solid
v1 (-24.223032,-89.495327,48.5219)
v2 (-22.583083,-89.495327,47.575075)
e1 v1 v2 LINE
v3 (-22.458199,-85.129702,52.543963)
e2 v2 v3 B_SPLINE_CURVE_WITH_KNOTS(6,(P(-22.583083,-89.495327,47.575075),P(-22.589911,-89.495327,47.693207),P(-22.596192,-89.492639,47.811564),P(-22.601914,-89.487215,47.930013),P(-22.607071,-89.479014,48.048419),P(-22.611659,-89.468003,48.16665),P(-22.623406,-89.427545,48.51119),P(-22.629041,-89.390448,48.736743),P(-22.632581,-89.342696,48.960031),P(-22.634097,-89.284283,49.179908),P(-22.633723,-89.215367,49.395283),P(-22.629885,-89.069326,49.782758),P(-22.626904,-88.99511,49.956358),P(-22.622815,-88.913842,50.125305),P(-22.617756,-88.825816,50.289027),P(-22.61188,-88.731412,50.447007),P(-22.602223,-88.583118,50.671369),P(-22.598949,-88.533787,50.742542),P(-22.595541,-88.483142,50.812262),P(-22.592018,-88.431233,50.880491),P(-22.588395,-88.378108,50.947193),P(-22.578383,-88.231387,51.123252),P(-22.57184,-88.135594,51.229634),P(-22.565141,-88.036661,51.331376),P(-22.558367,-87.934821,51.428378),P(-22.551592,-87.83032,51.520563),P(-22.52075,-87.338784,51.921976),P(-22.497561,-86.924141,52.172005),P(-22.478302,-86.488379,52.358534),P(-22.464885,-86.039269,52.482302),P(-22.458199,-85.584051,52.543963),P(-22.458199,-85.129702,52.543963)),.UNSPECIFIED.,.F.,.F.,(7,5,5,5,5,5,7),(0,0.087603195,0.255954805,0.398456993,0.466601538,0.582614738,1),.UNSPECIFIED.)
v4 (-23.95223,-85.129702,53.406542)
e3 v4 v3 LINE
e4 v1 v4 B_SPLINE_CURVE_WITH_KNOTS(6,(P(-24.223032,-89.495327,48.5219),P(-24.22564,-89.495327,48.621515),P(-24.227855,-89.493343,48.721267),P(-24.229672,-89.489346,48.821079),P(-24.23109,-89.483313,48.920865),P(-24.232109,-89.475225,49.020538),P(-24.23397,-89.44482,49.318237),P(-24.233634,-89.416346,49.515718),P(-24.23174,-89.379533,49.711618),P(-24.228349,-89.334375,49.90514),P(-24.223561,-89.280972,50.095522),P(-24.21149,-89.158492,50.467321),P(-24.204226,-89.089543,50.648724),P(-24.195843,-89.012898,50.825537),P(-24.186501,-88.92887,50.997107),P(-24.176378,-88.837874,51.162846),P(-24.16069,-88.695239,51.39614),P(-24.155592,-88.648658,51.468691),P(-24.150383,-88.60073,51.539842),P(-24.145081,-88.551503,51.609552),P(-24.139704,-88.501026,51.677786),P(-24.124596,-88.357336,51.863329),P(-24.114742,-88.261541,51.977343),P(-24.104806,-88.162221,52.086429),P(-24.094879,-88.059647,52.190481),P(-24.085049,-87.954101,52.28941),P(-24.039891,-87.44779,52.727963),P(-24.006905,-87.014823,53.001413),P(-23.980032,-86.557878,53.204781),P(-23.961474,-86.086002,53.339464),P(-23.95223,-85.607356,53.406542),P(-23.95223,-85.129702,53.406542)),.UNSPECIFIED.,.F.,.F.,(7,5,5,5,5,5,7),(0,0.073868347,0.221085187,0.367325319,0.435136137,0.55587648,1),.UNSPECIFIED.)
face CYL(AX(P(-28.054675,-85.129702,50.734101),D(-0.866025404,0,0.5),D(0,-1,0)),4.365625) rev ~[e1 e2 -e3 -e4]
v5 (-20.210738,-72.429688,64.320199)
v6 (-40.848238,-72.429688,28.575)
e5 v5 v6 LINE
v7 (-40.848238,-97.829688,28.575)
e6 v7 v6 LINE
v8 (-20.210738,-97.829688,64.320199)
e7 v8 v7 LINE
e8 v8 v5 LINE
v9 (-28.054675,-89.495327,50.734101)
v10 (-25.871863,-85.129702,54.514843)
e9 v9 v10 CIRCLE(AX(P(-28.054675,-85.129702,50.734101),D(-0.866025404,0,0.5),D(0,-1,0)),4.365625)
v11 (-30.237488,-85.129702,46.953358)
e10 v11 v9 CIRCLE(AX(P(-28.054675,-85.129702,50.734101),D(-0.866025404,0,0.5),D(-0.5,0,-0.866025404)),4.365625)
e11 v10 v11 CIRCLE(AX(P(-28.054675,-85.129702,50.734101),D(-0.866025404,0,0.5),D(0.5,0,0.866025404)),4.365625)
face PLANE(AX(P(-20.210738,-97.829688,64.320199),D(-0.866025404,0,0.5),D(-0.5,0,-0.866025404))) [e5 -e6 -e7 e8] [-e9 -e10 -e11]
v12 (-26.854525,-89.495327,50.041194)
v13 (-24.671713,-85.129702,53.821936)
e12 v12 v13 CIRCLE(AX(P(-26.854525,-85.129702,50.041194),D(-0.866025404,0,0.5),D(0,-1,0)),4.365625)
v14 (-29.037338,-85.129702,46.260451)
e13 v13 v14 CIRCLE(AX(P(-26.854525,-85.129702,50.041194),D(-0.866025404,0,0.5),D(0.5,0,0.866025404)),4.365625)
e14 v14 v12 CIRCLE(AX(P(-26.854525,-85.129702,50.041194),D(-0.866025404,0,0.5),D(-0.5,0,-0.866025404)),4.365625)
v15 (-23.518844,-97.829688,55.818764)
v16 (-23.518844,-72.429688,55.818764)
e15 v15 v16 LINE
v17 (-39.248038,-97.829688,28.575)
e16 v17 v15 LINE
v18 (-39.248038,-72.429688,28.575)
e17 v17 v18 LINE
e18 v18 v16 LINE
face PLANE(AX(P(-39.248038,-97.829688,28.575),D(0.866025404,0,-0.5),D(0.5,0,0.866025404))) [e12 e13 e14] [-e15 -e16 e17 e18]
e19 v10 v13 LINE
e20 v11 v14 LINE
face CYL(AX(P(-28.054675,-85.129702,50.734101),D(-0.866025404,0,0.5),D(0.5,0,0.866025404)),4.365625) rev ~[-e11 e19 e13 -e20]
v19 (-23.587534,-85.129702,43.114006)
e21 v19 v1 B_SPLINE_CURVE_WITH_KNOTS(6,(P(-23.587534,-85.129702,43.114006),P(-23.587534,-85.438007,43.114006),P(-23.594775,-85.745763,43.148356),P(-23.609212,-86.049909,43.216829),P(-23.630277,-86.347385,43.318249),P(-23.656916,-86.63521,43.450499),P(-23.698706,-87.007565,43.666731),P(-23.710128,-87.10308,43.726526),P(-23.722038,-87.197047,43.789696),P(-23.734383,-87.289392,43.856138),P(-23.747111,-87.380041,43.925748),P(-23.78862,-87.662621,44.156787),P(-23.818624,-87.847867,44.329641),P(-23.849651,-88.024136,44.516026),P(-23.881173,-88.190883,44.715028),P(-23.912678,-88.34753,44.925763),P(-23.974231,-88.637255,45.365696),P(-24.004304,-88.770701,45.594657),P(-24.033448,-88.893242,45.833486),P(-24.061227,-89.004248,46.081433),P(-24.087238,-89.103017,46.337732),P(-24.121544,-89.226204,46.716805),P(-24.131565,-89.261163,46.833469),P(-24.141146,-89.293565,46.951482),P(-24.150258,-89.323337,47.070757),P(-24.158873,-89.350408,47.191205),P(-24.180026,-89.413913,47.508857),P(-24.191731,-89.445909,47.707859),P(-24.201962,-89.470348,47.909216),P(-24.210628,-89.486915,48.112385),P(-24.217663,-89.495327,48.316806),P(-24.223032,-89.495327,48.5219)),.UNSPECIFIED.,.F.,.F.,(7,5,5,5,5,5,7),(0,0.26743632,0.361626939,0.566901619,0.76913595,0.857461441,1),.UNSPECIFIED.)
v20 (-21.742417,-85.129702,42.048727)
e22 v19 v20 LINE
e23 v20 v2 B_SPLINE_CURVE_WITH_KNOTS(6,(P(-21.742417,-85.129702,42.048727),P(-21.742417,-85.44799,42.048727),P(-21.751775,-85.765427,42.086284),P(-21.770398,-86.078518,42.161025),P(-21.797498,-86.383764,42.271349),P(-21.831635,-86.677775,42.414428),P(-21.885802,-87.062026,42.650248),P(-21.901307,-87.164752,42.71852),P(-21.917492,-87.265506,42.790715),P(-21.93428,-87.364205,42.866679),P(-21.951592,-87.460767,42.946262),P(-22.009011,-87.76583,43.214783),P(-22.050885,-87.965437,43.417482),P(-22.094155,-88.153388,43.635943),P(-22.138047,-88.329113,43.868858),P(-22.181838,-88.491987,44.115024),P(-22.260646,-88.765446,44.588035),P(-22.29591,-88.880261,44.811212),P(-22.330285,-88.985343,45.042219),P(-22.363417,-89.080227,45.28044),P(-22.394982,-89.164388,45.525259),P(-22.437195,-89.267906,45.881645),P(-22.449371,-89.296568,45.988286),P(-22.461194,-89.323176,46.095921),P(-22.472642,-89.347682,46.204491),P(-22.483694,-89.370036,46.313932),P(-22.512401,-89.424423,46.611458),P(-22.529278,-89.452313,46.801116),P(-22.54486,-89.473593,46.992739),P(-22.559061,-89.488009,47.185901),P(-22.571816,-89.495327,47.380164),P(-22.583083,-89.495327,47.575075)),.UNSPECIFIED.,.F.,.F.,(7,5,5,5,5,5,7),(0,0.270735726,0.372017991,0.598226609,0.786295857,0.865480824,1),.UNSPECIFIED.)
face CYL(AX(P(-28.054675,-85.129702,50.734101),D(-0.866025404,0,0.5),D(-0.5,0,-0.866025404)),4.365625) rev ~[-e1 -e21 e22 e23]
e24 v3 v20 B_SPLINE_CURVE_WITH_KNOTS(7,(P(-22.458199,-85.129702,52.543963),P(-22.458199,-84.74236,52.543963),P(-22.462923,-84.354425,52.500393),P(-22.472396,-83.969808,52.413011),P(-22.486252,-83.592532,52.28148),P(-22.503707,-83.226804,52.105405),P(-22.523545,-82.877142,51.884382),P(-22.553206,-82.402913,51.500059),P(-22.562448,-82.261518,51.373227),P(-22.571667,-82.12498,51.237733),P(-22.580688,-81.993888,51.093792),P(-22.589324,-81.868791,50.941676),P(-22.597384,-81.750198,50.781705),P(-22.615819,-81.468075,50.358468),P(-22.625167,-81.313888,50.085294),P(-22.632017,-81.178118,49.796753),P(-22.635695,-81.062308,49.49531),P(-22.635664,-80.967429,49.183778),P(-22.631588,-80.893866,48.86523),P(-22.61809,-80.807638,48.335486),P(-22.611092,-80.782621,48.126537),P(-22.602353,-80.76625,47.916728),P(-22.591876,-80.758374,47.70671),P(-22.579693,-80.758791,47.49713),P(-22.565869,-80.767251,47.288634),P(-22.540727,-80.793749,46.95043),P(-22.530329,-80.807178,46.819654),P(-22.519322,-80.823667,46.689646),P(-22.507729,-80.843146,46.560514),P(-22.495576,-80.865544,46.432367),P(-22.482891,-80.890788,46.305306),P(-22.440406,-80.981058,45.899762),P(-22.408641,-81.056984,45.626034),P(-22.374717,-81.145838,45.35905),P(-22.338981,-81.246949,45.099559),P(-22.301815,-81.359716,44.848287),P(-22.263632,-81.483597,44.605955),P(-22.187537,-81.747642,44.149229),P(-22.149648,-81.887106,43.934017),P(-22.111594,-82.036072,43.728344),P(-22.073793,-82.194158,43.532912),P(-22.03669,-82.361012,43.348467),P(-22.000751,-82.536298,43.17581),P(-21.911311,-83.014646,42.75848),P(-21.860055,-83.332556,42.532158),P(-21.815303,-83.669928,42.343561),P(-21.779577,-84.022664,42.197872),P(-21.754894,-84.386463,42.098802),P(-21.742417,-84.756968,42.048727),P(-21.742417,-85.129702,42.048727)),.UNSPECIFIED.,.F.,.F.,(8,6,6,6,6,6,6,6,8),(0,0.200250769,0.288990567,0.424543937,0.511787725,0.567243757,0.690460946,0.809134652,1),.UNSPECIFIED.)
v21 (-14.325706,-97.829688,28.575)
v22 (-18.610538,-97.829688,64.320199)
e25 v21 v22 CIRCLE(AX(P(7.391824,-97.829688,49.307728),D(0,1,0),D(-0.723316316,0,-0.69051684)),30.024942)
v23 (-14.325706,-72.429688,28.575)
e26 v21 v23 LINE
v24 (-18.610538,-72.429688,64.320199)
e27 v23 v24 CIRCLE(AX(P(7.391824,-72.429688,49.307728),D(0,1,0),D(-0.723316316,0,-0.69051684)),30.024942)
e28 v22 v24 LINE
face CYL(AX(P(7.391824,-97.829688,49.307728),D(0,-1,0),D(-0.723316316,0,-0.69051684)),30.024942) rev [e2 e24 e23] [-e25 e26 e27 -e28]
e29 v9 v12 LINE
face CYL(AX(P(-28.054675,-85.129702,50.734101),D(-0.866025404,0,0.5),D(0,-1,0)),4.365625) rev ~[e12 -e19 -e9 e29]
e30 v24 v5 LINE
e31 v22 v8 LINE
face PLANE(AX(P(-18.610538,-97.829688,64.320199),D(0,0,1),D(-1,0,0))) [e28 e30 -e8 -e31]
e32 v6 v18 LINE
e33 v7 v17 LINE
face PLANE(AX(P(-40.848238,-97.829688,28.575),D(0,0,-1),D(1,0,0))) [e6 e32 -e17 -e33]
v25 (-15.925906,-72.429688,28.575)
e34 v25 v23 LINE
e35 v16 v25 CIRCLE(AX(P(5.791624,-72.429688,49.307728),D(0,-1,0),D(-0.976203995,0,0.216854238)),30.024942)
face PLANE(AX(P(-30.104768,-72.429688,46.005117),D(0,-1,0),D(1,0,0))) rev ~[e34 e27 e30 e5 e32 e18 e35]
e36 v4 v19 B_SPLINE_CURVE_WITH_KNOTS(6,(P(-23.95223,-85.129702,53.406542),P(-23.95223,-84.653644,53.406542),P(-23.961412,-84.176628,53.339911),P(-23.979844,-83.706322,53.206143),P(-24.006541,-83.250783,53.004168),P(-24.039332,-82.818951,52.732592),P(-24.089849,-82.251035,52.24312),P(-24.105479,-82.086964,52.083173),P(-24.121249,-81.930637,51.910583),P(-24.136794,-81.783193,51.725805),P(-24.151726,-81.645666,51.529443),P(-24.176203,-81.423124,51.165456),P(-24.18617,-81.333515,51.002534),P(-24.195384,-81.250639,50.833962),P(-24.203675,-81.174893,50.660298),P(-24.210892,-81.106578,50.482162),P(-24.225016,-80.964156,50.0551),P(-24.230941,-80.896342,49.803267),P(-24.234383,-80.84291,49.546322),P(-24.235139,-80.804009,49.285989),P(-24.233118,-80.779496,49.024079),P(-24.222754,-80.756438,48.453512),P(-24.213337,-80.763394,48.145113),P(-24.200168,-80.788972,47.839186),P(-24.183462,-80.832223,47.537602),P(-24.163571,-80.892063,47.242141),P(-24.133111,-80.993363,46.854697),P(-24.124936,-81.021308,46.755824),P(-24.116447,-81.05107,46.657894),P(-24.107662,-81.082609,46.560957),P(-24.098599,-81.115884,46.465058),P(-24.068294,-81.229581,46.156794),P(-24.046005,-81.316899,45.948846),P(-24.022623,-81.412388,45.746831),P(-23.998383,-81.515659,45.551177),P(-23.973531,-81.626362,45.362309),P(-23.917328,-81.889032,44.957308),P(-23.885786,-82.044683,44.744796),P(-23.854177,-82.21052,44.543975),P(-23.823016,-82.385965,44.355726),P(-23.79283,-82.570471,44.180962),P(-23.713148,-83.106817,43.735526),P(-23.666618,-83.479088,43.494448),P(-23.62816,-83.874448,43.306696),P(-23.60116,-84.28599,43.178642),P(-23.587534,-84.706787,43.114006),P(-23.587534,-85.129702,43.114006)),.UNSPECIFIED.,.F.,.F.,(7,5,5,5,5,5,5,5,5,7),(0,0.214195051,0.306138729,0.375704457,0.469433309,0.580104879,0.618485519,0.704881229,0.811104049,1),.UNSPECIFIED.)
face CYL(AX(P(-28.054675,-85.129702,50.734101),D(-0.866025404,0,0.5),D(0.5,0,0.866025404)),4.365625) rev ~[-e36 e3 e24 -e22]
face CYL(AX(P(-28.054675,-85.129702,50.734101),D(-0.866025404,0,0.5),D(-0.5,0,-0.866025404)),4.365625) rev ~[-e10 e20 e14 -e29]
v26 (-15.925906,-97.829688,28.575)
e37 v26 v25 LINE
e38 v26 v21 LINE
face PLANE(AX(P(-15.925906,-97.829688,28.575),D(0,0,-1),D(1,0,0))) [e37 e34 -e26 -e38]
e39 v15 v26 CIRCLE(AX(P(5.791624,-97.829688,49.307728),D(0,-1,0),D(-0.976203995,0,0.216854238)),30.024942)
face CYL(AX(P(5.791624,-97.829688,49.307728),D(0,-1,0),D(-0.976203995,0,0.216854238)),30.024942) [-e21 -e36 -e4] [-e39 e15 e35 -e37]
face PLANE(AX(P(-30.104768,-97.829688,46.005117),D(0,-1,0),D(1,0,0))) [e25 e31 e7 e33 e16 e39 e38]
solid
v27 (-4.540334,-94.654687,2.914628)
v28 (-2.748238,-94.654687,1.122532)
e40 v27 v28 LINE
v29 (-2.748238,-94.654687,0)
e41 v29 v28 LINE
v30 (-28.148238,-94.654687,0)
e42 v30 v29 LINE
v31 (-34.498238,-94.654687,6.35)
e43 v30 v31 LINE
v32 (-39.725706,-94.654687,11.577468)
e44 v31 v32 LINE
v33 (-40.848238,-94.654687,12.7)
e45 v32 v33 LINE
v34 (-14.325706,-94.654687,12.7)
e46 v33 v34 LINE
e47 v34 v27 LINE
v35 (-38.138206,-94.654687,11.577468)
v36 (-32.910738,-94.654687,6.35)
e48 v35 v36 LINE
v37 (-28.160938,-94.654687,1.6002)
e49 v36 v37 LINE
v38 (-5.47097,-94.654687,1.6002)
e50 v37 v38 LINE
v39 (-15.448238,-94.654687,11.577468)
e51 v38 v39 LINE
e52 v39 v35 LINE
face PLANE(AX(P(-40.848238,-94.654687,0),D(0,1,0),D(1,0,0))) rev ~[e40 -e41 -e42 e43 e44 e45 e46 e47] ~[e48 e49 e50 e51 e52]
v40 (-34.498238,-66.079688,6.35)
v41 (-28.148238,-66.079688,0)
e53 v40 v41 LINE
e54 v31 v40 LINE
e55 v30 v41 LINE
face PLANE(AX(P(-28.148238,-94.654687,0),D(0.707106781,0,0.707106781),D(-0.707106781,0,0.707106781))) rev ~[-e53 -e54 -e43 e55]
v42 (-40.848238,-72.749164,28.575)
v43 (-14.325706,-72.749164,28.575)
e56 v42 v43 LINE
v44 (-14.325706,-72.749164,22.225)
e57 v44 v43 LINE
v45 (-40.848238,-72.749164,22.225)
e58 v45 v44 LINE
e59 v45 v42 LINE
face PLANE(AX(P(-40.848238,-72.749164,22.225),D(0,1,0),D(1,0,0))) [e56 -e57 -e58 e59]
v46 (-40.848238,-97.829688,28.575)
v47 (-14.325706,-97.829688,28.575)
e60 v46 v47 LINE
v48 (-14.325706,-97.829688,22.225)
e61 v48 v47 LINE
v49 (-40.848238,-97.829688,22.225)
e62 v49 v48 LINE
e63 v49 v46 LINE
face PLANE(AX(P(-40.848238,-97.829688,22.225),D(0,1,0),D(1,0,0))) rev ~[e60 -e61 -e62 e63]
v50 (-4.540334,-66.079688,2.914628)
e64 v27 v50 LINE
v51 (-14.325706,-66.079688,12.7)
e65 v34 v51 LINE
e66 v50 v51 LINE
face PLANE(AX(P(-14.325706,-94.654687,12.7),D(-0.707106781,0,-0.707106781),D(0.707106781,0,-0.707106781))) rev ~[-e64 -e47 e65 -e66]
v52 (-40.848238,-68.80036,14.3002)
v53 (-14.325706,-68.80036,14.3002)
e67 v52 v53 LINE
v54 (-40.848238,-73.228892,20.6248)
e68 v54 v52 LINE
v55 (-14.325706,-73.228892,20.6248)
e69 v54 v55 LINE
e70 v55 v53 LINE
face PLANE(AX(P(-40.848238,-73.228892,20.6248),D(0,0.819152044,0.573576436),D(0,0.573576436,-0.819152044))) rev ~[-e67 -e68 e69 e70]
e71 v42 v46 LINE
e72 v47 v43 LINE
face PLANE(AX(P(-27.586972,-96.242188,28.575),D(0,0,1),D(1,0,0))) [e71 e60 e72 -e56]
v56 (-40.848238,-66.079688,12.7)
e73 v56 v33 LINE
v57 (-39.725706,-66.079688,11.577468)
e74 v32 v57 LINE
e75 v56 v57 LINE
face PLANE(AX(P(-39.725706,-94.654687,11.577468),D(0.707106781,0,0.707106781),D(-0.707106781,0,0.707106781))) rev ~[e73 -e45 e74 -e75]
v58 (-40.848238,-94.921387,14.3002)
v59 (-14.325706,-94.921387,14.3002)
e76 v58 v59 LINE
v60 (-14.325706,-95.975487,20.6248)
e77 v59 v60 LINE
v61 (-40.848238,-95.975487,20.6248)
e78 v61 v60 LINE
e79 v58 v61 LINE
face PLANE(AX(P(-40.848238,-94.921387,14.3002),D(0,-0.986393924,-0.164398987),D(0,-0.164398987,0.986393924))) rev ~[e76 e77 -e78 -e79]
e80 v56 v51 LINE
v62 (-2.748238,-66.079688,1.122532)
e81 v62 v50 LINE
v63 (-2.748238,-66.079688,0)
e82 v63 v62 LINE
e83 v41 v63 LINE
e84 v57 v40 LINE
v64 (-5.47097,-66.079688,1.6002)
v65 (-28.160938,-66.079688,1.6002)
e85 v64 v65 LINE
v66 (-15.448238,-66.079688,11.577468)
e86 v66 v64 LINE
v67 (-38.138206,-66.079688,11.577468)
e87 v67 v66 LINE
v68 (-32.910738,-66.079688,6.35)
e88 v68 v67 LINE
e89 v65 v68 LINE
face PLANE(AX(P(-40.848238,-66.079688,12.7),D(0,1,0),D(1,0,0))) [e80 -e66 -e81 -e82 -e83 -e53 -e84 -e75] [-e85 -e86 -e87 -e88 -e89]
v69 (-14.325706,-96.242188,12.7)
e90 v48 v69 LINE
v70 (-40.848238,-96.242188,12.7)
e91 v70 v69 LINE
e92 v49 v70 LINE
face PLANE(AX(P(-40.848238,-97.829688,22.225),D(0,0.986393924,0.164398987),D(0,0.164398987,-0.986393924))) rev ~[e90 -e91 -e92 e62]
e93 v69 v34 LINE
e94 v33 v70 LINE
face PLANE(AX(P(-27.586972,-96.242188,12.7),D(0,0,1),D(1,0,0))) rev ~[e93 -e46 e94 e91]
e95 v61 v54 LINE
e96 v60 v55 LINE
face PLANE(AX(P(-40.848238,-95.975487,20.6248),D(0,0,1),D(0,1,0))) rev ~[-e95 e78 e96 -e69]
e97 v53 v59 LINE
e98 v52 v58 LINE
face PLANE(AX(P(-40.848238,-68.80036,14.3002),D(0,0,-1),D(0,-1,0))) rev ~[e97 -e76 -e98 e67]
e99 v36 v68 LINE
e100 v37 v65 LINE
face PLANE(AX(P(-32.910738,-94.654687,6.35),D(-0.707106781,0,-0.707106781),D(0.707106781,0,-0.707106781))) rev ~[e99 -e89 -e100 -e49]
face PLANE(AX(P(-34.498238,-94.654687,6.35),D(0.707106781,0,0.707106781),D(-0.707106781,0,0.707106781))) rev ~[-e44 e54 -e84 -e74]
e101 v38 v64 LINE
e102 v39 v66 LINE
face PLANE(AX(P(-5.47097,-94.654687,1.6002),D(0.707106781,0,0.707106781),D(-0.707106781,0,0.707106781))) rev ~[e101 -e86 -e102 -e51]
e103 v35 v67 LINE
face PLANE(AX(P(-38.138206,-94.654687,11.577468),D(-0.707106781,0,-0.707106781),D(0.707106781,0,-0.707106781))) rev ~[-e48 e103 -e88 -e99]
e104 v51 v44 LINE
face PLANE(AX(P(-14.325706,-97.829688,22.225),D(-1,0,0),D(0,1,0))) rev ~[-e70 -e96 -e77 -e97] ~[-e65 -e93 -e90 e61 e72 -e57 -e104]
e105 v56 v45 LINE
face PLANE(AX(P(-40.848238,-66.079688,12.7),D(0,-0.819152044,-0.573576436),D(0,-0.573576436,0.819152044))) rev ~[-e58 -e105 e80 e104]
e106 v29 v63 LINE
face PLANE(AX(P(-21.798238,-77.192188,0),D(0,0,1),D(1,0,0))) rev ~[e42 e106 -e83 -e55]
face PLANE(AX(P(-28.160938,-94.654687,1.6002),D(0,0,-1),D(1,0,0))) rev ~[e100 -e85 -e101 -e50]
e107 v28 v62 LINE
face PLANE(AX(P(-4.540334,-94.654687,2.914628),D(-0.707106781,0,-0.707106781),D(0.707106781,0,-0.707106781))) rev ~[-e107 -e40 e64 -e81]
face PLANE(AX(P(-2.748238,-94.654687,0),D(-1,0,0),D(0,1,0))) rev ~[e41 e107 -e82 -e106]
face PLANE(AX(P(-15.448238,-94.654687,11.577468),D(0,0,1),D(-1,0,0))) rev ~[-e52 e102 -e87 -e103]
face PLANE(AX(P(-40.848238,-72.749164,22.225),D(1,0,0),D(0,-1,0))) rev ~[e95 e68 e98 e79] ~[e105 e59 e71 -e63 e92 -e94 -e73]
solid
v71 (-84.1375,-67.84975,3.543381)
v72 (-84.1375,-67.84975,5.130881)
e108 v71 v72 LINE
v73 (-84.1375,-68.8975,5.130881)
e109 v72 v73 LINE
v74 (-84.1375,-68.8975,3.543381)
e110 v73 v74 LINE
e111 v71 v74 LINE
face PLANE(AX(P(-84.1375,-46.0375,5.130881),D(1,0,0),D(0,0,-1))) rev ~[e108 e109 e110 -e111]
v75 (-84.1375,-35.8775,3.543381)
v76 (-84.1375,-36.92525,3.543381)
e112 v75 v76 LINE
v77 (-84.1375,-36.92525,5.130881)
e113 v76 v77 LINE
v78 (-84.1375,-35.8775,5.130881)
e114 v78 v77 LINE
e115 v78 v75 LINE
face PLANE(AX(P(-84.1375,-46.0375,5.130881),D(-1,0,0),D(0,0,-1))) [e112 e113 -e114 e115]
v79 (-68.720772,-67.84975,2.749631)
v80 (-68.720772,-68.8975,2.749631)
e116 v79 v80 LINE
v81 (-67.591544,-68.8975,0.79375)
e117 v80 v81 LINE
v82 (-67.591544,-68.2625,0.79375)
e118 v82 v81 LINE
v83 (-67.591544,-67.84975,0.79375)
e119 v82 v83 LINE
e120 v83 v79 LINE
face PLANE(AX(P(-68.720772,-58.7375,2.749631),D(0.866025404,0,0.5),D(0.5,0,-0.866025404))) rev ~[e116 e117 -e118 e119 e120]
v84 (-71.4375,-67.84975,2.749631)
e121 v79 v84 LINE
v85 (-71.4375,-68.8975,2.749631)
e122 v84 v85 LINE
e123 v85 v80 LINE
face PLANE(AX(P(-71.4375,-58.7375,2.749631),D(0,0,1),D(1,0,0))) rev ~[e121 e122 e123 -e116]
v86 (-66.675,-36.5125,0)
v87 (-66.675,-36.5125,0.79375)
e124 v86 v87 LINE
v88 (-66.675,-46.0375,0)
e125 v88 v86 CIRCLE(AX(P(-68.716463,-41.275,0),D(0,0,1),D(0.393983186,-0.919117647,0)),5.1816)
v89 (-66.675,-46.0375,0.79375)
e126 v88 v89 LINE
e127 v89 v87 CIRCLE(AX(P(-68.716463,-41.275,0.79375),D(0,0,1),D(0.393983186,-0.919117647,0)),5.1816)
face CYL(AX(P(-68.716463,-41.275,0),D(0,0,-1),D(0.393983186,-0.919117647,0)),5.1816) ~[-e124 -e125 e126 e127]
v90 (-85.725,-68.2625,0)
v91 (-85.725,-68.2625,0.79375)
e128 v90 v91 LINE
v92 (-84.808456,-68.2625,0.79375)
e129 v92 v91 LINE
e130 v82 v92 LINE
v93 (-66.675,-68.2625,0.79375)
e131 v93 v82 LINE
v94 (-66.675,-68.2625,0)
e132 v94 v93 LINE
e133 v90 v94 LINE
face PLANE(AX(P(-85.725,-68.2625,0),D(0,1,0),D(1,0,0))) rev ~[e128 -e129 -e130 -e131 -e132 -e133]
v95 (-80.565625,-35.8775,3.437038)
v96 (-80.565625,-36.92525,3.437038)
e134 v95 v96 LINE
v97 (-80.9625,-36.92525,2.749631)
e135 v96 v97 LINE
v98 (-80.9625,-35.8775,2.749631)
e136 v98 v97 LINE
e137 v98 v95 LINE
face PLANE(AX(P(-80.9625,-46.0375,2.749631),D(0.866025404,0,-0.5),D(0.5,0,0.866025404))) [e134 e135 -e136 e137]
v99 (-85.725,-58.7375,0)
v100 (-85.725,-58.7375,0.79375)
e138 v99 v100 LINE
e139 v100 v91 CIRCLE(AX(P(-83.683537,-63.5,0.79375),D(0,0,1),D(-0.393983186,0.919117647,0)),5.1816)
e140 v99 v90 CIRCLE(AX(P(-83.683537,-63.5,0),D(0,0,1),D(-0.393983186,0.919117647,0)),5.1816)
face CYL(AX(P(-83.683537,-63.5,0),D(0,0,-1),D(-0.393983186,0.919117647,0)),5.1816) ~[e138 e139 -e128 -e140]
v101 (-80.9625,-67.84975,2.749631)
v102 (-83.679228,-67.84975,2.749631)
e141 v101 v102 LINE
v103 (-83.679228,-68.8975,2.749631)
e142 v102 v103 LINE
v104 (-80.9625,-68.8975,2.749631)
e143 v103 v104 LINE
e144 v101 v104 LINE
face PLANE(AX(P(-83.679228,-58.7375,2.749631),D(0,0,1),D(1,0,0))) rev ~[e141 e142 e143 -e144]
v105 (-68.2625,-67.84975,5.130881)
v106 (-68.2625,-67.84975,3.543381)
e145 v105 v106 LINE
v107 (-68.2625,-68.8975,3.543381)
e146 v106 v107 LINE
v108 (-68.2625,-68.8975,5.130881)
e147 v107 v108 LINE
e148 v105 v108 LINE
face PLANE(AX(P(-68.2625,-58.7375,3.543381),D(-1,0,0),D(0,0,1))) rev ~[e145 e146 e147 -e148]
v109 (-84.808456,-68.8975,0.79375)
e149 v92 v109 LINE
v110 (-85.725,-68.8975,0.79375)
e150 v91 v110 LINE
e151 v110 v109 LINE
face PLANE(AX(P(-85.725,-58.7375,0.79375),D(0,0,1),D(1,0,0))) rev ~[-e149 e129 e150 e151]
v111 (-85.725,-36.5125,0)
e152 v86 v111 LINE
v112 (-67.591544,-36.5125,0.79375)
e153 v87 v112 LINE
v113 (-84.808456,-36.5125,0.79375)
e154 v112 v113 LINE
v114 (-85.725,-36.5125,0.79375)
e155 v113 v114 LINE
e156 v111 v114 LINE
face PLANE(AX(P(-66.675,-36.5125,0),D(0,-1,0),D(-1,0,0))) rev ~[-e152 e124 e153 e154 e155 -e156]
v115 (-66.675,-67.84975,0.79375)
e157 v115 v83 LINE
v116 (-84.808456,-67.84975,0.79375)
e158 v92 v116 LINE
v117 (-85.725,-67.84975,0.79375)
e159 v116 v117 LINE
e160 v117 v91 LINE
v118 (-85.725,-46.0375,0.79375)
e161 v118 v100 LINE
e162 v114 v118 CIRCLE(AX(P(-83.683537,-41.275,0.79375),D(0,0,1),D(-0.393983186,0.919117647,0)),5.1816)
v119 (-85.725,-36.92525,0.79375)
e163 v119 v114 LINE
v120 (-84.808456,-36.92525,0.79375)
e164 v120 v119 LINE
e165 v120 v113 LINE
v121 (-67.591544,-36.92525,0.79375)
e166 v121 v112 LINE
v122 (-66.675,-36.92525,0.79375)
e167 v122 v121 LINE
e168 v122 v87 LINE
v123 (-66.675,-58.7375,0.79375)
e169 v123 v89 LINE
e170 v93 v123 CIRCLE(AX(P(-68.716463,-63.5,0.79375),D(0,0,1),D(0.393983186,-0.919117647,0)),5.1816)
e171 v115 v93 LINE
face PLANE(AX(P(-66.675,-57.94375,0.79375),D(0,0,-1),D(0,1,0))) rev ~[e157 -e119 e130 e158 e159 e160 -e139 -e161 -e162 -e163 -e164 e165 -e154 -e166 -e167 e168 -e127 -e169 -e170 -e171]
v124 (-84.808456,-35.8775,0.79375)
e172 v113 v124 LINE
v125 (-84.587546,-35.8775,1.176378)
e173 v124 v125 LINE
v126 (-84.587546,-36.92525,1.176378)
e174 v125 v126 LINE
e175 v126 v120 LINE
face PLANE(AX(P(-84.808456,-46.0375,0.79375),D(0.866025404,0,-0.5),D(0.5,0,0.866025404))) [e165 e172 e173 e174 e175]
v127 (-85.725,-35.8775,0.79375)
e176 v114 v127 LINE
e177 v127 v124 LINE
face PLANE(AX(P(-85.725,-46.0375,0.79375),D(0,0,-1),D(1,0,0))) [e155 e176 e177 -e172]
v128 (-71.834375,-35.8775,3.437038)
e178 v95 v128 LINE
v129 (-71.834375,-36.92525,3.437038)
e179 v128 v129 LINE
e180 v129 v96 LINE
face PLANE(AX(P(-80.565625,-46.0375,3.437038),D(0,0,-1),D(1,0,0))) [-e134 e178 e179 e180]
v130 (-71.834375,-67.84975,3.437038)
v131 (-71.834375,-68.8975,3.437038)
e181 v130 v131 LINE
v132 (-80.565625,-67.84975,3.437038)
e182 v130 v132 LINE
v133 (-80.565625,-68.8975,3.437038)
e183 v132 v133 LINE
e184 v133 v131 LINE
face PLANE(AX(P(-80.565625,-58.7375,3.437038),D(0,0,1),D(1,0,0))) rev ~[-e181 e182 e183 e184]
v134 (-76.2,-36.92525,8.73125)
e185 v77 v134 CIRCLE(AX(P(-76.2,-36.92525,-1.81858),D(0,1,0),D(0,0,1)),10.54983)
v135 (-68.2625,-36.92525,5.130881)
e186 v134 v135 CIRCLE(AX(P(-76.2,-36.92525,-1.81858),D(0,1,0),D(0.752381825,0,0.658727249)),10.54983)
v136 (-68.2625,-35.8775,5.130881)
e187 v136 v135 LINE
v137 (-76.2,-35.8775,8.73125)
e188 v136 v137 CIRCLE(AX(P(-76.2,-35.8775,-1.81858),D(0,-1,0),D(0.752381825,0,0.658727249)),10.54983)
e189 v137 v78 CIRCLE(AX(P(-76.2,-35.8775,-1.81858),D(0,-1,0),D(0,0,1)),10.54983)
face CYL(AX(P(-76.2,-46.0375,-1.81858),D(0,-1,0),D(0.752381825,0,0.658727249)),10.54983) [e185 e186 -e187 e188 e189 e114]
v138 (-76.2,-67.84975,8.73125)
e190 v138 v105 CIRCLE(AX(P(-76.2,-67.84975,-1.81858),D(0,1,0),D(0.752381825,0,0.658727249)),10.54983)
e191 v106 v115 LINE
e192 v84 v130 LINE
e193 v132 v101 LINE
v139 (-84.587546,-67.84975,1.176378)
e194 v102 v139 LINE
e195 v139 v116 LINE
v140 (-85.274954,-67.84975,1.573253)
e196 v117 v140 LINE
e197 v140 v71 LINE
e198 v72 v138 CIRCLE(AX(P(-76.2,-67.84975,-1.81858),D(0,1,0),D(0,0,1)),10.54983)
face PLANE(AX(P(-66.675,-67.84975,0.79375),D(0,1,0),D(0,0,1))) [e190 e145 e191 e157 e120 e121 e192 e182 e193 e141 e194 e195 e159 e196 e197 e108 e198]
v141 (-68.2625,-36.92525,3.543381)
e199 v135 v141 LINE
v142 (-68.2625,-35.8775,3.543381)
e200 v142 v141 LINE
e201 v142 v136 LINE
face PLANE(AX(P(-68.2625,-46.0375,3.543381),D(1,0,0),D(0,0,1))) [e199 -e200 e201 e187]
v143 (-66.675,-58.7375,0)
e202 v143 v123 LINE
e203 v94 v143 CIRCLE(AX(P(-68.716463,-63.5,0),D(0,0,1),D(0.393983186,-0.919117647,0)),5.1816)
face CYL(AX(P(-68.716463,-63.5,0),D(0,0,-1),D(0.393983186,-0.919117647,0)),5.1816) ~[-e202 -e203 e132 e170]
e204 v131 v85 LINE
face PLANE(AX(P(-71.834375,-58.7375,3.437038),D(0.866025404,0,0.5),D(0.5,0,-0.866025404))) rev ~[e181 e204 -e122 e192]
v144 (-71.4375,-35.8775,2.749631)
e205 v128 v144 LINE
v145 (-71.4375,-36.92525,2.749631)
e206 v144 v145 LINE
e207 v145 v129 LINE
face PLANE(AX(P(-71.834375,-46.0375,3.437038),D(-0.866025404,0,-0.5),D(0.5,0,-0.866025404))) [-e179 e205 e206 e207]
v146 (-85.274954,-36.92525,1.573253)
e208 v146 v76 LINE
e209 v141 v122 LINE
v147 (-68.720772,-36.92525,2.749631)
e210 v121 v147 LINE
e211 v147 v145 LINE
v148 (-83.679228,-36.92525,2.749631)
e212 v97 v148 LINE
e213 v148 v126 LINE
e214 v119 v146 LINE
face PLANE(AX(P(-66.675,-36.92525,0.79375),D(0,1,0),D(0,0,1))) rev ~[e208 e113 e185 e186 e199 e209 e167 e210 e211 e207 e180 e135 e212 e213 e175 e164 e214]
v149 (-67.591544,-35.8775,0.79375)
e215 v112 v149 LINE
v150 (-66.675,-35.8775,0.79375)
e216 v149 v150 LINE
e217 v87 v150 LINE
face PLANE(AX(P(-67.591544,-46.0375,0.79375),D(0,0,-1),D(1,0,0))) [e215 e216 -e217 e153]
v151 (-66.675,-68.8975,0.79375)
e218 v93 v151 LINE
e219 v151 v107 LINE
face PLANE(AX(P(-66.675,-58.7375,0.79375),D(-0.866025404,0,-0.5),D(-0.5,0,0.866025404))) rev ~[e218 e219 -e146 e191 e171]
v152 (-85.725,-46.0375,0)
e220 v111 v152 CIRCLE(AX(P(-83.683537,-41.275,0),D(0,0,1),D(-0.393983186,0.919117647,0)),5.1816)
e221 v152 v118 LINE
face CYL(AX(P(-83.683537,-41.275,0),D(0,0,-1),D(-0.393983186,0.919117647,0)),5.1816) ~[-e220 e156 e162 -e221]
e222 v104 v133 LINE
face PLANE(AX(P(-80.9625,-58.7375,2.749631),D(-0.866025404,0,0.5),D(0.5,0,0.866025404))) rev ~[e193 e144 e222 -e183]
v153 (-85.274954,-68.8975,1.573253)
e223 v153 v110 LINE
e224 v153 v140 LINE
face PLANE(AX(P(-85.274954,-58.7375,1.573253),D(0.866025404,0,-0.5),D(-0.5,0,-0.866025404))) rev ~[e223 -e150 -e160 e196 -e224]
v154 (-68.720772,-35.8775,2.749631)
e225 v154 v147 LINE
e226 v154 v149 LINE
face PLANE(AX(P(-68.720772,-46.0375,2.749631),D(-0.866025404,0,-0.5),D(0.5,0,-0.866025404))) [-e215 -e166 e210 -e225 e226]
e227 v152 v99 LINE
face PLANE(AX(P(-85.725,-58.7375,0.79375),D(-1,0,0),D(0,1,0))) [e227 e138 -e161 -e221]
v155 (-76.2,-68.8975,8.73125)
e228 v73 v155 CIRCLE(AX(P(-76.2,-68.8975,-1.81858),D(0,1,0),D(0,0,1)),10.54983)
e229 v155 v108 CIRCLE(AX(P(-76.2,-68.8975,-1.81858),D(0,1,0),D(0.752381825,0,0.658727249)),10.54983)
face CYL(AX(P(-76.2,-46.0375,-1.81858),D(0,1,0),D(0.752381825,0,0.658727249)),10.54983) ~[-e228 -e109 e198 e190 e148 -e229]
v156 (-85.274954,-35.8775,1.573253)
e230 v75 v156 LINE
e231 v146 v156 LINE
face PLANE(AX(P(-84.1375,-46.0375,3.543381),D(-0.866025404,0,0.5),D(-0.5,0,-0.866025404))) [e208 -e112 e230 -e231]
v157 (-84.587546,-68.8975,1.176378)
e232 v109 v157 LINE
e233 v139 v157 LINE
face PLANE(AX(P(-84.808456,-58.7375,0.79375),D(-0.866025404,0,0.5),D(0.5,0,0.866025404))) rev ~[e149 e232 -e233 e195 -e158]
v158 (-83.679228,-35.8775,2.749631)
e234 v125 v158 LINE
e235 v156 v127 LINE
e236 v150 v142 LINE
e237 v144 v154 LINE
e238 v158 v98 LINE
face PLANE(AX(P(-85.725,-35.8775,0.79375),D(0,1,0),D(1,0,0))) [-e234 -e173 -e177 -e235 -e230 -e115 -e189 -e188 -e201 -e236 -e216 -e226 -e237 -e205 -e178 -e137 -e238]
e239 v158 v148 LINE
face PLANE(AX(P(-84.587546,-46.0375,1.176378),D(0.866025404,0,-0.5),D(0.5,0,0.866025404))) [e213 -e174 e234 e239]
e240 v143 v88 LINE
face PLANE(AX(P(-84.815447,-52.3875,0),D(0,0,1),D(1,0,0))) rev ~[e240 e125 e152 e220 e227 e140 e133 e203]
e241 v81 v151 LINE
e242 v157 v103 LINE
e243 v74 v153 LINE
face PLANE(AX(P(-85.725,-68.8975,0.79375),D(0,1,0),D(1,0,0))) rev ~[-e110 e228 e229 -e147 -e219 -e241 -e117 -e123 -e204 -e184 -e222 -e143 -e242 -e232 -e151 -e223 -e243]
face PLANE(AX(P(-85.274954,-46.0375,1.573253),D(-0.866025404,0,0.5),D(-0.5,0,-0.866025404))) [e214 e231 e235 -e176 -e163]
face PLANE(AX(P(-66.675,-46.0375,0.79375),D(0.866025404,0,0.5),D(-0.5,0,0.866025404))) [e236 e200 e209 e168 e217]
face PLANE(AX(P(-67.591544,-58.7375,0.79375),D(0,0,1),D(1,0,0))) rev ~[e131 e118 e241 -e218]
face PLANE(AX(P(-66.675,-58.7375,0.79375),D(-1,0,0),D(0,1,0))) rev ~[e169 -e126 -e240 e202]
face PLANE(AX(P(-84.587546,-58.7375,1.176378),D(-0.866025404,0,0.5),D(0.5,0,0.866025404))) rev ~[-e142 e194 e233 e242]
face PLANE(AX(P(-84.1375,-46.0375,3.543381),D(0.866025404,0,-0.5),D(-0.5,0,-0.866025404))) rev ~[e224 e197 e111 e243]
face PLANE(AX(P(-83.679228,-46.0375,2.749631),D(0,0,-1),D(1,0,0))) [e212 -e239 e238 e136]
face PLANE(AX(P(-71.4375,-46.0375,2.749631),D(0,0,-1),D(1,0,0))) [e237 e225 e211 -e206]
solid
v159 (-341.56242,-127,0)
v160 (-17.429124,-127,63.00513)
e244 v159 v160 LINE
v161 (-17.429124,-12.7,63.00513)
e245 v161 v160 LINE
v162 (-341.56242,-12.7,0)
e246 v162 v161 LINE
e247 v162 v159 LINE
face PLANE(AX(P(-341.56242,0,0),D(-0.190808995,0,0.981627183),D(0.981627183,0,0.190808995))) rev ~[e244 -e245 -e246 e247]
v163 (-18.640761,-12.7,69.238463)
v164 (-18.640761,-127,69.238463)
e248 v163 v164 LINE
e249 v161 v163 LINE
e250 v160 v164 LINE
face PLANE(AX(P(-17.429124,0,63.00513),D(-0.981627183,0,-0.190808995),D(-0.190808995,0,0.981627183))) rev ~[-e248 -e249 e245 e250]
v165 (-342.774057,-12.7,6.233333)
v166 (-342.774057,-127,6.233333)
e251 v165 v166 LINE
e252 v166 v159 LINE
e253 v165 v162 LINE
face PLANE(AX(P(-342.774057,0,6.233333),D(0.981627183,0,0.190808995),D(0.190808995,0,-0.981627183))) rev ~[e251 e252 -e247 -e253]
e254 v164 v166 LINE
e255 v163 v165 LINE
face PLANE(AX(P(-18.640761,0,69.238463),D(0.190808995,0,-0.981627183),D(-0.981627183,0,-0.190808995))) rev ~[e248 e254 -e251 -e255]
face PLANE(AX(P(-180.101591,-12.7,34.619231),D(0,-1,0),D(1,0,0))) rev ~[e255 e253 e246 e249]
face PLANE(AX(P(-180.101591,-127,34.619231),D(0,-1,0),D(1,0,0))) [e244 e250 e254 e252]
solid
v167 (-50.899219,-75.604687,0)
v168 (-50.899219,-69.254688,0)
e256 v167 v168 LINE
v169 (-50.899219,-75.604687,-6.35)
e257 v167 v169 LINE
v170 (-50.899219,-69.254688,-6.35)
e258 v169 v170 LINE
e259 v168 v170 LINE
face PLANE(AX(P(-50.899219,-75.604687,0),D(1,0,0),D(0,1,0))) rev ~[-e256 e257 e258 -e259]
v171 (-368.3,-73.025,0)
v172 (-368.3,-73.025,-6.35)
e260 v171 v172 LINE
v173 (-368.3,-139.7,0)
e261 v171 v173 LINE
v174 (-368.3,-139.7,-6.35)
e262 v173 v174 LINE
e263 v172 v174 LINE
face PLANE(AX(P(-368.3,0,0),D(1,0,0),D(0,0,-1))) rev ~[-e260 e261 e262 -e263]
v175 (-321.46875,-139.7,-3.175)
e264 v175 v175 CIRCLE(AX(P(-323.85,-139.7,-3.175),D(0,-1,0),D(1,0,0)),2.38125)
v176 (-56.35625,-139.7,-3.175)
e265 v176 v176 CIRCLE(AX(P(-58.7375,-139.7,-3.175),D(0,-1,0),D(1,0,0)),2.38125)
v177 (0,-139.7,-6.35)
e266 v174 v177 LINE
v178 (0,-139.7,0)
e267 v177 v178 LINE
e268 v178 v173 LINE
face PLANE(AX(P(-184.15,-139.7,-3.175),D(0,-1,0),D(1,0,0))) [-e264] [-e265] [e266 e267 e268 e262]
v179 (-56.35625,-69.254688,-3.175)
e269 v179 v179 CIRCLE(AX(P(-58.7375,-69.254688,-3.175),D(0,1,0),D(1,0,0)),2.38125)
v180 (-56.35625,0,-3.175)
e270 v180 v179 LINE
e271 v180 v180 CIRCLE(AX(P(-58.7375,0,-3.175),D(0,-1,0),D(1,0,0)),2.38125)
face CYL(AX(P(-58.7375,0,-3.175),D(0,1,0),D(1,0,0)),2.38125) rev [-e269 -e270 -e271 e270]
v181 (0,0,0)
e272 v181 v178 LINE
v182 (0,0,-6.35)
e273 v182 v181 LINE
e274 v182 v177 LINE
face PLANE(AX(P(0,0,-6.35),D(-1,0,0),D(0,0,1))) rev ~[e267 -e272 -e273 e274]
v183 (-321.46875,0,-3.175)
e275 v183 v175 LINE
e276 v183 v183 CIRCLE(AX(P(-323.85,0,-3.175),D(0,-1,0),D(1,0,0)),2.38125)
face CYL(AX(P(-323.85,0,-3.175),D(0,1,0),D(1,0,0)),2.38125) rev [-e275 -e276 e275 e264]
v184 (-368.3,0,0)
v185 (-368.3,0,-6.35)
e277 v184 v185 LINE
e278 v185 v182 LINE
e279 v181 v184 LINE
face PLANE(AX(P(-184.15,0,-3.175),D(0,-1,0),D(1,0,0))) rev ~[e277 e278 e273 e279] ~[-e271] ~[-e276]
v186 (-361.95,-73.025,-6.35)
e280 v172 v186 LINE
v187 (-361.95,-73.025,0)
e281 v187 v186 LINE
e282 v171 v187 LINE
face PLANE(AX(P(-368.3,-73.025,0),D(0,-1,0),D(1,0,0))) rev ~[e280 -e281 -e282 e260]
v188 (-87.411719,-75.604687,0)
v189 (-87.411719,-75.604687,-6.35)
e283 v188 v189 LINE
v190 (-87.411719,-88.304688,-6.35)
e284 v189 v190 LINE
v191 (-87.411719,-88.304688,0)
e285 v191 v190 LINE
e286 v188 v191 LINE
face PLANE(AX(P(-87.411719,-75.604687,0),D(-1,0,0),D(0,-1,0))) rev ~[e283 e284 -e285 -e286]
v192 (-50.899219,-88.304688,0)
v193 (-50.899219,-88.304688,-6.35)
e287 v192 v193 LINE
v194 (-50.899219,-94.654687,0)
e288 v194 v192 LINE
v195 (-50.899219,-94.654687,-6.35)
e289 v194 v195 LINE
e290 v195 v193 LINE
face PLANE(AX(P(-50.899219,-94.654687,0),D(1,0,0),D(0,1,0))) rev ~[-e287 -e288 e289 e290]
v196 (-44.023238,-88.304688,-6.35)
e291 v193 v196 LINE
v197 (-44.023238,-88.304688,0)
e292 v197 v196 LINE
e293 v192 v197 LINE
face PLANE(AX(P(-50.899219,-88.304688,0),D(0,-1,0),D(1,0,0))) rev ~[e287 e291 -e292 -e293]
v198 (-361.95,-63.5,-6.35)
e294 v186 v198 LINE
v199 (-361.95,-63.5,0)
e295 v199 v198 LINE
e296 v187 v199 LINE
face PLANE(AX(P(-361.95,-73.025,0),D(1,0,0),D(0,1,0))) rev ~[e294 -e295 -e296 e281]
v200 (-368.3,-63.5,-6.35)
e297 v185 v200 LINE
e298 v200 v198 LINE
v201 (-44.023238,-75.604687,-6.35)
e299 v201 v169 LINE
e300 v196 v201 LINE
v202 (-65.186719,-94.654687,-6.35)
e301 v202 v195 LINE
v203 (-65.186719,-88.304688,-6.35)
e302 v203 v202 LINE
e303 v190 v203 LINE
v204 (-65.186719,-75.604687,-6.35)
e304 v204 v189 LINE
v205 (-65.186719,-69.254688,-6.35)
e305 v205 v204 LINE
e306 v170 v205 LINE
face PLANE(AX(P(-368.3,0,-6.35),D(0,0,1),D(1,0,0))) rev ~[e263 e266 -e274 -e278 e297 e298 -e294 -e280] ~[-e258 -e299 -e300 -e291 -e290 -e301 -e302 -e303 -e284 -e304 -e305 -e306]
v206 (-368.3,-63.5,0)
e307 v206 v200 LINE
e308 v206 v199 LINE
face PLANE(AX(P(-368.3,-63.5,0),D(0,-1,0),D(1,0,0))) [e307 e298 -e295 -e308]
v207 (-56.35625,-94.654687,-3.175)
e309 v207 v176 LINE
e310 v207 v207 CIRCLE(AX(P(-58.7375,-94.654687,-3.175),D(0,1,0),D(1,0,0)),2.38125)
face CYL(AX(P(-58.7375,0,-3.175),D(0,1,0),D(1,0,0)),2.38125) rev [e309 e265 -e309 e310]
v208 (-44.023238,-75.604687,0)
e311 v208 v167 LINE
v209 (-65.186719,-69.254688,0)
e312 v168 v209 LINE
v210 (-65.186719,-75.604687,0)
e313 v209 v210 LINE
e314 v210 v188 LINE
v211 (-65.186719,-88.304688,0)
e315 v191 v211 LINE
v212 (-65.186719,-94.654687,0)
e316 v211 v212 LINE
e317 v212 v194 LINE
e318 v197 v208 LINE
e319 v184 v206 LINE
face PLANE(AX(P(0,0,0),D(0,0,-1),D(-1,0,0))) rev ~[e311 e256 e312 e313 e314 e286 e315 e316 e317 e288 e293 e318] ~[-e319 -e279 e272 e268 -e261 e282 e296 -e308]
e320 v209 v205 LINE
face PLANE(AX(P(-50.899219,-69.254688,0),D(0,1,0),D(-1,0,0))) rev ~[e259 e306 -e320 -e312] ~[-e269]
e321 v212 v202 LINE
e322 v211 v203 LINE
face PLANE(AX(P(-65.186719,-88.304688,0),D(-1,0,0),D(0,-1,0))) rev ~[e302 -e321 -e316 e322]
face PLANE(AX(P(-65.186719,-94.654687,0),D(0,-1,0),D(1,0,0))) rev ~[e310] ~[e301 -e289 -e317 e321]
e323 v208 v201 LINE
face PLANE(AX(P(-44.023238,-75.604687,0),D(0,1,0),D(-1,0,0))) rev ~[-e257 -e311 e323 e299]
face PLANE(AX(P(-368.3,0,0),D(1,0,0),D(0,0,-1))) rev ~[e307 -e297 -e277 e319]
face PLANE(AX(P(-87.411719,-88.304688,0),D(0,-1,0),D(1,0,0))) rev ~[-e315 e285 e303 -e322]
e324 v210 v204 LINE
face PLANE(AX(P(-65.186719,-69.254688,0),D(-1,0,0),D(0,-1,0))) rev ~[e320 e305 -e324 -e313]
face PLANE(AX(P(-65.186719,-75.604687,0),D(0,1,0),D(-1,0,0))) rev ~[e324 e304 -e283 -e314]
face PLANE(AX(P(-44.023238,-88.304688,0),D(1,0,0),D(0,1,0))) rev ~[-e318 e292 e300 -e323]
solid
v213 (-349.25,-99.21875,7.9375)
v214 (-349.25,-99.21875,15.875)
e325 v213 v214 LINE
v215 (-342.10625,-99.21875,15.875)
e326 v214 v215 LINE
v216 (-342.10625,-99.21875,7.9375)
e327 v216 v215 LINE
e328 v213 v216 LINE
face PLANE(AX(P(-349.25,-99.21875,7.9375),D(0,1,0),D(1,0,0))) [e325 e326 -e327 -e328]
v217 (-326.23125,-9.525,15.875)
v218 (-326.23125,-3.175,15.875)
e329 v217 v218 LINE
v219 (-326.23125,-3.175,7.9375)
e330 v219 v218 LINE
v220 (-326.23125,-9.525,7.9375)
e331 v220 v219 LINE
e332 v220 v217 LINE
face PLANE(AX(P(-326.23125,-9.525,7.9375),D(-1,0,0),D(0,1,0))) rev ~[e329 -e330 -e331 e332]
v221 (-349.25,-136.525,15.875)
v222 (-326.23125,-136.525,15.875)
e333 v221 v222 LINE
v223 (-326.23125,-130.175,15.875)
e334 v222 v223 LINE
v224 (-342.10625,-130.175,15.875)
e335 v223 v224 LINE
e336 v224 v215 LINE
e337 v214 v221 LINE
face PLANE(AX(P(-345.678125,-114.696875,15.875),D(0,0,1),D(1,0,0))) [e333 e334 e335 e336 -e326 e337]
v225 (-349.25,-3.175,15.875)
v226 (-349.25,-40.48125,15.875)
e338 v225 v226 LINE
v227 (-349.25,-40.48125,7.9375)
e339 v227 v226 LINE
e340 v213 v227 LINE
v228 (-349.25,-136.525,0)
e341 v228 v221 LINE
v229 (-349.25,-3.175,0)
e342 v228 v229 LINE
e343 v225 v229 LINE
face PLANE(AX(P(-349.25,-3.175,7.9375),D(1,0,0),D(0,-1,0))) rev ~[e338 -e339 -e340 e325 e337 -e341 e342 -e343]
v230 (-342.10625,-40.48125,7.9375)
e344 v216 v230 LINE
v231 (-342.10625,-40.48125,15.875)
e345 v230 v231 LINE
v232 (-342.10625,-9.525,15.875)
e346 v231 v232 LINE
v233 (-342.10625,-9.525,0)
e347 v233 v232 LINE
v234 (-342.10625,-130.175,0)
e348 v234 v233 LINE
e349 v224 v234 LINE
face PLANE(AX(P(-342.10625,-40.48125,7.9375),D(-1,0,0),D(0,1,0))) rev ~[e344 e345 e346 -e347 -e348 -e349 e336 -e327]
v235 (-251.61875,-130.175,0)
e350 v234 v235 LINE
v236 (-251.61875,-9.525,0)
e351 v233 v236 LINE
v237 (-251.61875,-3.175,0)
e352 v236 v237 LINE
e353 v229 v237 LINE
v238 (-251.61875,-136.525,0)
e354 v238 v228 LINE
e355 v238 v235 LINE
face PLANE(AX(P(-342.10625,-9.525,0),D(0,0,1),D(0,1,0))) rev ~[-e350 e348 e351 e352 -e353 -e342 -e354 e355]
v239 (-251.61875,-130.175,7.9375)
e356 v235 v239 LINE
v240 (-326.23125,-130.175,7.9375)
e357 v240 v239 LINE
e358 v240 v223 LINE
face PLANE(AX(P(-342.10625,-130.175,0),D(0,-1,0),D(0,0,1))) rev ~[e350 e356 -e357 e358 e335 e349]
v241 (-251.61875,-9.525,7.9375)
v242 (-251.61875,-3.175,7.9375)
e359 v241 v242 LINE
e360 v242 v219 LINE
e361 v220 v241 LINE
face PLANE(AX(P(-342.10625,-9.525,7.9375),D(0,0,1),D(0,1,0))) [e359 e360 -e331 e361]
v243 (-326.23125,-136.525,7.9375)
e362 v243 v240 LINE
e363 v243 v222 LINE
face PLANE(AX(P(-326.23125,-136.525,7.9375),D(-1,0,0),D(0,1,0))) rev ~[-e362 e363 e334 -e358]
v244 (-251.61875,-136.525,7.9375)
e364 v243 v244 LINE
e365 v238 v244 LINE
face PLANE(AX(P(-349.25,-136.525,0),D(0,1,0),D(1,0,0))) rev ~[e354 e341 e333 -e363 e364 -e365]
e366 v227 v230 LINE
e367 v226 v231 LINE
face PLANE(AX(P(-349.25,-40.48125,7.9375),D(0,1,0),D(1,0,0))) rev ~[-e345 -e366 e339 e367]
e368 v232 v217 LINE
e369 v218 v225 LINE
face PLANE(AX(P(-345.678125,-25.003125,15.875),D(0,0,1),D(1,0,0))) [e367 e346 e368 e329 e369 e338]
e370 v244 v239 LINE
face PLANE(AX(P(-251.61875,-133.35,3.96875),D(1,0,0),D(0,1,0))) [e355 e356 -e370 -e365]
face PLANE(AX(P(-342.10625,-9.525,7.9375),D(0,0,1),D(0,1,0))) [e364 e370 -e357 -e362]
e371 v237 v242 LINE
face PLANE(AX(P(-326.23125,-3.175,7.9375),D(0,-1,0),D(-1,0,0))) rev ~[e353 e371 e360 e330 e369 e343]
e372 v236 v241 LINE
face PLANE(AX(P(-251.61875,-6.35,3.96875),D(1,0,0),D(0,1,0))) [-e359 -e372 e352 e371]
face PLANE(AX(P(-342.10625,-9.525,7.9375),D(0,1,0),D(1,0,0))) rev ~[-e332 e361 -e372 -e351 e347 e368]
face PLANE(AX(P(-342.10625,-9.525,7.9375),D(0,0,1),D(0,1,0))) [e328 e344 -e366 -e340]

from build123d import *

# Parameters (mm, degrees)
F0_R      = 2.38125
F1_DEPTH  = 139.7
F2_W      = 6.35
F2_H      = 9.525
F3_DEPTH  = 25.4
F2_W_2    = 12.7
F2_H_2    = 31.75
F4_DEPTH  = 0.79375
F5_W      = 19.05
F5_H      = 12.7
F6_DEPTH  = 7.9375
F8_DEPTH  = 44.45
F9_W      = 11.1125
F9_H      = 9.3597000718
F10_DEPTH = 22.352
F11_DEPTH = 10.16
F12_DEPTH = 10.16
F13_DEPTH = 9.906
F14_DEPTH = 9.906
F15_DEPTH = 6.35
F2_W_3    = 38.1
F2_H_3    = 22.225
F2_H_4    = 6.35
F16_DEPTH = 12.7
F18_DEPTH = 30.48
F19_W     = 26.5225320151
F19_H     = 3.175
F19_H_2   = 28.575
F20_DEPTH = 9.525
F22_DEPTH = 31.75
F23_DEPTH = 6.35
F25_DEPTH = 25.4
F28_DEPTH = 25.4
F29_DEPTH = 127
F30_DEPTH = 12.7
F2_W_4    = 7.14375
F2_H_5    = 133.35
F31_DEPTH = 7.9375
F32_W     = 6.35
F32_H     = 7.9375
F33_DEPTH = 90.4875
F34_W     = 7.14375
F34_H     = 30.95625
F35_DEPTH = 7.9375


with BuildPart() as f1:
    # F0 (on Front) → F1 (new body)
    with BuildSketch(Plane.XZ):
        Polygon((0, -6.35), (0, 0), (-341.5624201298, 0), (-368.3, 0), (-368.3, -6.35), align=None)
        with Locations((-323.85, -3.175)):
            Circle(F0_R, mode=Mode.SUBTRACT)
        with Locations((-58.7375, -3.175)):
            Circle(F0_R, mode=Mode.SUBTRACT)
    extrude(amount=F1_DEPTH)

    # F2 (on face) → F3 (cut)
    with BuildSketch(Plane.XY):
        with Locations((-365.125, -68.2625)):
            Rectangle(F2_W, F2_H)
    extrude(amount=-F3_DEPTH, mode=Mode.SUBTRACT)

    # F2 (on face) → F15 (cut)
    with BuildSketch(Plane.XY):
        Polygon((-87.41171875, -75.6046875), (-87.41171875, -88.3046875), (-65.18671875, -88.3046875), (-65.18671875, -94.6546875), (-50.89921875, -94.6546875), (-50.89921875, -88.3046875), (-44.0232381225, -88.3046875), (-44.0232381225, -75.6046875), (-50.89921875, -75.6046875), (-50.89921875, -69.2546875), (-65.18671875, -69.2546875), (-65.18671875, -75.6046875), align=None)
    extrude(amount=-F15_DEPTH, mode=Mode.SUBTRACT)


with BuildPart() as f4:
    # F2 (on face) → F4 (new body)
    with BuildSketch(Plane.XY):
        with BuildLine():
            Line((-82.55, -36.5125), (-85.725, -36.5125))
            ThreePointArc((-85.725, -36.5125), (-88.8651367233, -41.275), (-85.725, -46.0375))
            Line((-85.725, -46.0375), (-85.725, -58.7375))
            ThreePointArc((-85.725, -58.7375), (-88.8651367233, -63.5), (-85.725, -68.2625))
            Line((-85.725, -68.2625), (-82.55, -68.2625))
            Line((-82.55, -68.2625), (-82.55, -36.5125))
        make_face()
        with Locations((-76.2, -52.3875)):
            Rectangle(F2_W_2, F2_H_2)
        with BuildLine():
            Line((-66.675, -36.5125), (-69.85, -36.5125))
            Line((-69.85, -36.5125), (-69.85, -68.2625))
            Line((-69.85, -68.2625), (-66.675, -68.2625))
            ThreePointArc((-66.675, -68.2625), (-63.5348632767, -63.5), (-66.675, -58.7375))
            Line((-66.675, -58.7375), (-66.675, -46.0375))
            ThreePointArc((-66.675, -46.0375), (-63.5348632767, -41.275), (-66.675, -36.5125))
        make_face()
    extrude(amount=F4_DEPTH)

    # F5 (on face) → F6 (join)
    with BuildSketch(Plane.XY.offset(0.79375)):
        with Locations((-76.2, -52.3875)):
            Rectangle(F5_W, F5_H)
    extrude(amount=F6_DEPTH)

    # F7 (on face) → F8 (cut)
    with BuildSketch(Plane(origin=(0, -46.0375, 0), x_dir=(-1, 0, 0), z_dir=(0, 1, 0))):
        with BuildLine():
            Line((76.2, 8.73125), (66.675, 8.73125))
            Line((66.675, 8.73125), (66.675, 0.79375))
            Line((66.675, 0.79375), (68.2625, 3.543380657))
            Line((68.2625, 3.543380657), (68.2625, 5.130880657))
            ThreePointArc((68.2625, 5.130880657), (71.8420599575, 7.789087289), (76.2, 8.73125))
        make_face()
        with BuildLine():
            Line((85.725, 8.73125), (76.2, 8.73125))
            ThreePointArc((76.2, 8.73125), (80.5579400425, 7.789087289), (84.1375, 5.130880657))
            Line((84.1375, 5.130880657), (84.1375, 3.543380657))
            Line((84.1375, 3.543380657), (85.2749538321, 1.5732528285))
            Line((85.2749538321, 1.5732528285), (85.725, 0.79375))
            Line((85.725, 0.79375), (85.725, 8.73125))
        make_face()
        Polygon((80.565625, 3.4370383213), (76.2, 3.4370383213), (76.2, 0.79375), (84.8084564477, 0.79375), (84.5875461679, 1.1763778285), (83.6792282238, 2.749630657), (80.9625, 2.749630657), align=None)
        Polygon((76.2, 0.79375), (76.2, 3.4370383213), (71.834375, 3.4370383213), (71.4375, 2.749630657), (68.7207717762, 2.749630657), (67.5915435523, 0.79375), align=None)
    extrude(amount=-F8_DEPTH, mode=Mode.SUBTRACT)

    # F9 (on face) → F10 (cut)
    with BuildSketch(Plane.YZ.offset(-66.675)):
        with Locations((-52.3875, 5.4736000359)):
            Rectangle(F9_W, F9_H)
    extrude(amount=-F10_DEPTH, mode=Mode.SUBTRACT)

    # F11 (add): a face of the model
    f11_faces = [f4.faces().sort_by_distance(p)[0] for p in [
        (-76.2, -58.7375, 5.3038676358),
    ]]
    extrude(f11_faces, amount=F11_DEPTH)

    # F12 (add): a face of the model
    f12_faces = [f4.faces().sort_by_distance(p)[0] for p in [
        (-76.2, -46.0375, 5.3038676358),
    ]]
    extrude(f12_faces, amount=F12_DEPTH)

    # F13 (cut): a face of the model
    f13_faces = [f4.faces().sort_by_distance(p)[0] for p in [
        (-76.2, -46.83125, 5.3038676358),
    ]]
    extrude(f13_faces, amount=-F13_DEPTH, mode=Mode.SUBTRACT)

    # F14 (cut): a face of the model
    f14_faces = [f4.faces().sort_by_distance(p)[0] for p in [
        (-76.2, -57.94375, 5.3038676358),
    ]]
    extrude(f14_faces, amount=-F14_DEPTH, mode=Mode.SUBTRACT)


with BuildPart() as f16:
    # F2 (on face) → F16 (new body)
    with BuildSketch(Plane.XY):
        with Locations((-21.7982381225, -77.1921875)):
            Rectangle(F2_W_3, F2_H_3)
        with Locations((-21.7982381225, -91.4796875)):
            Rectangle(F2_W_3, F2_H_4)
    extrude(amount=F16_DEPTH)

    # F17 (on face) → F18 (cut)
    with BuildSketch(Plane.XZ.offset(94.6546875)):
        Polygon((-5.4709701376, 1.6002), (-5.6628659544, 1.7920958168), (-15.4482381225, 11.5774679849), (-38.1382061073, 11.5774679849), (-32.9107381225, 6.35), (-28.1609381225, 1.6002), (-18.4952411801, 1.6002), align=None)
        Polygon((-4.5403339392, 2.9146278319), (-2.7482381225, 1.1225320151), (-2.7482381225, 12.7), (-14.3257061073, 12.7), align=None)
        Polygon((-39.7257061073, 11.5774679849), (-40.8482381225, 12.7), (-40.8482381225, 0), (-28.1482381225, 0), (-34.4982381225, 6.35), align=None)
    extrude(amount=-F18_DEPTH, mode=Mode.SUBTRACT)

    # F19 (on face) → F20 (join)
    with BuildSketch(Plane.XY.offset(12.7)):
        with Locations((-27.5869721149, -96.2421875)):
            Rectangle(F19_W, F19_H)
        with Locations((-27.5869721149, -80.3671875)):
            Rectangle(F19_W, F19_H_2)
    extrude(amount=F20_DEPTH)

    # F21 (on face) → F22 (cut)
    with BuildSketch(Plane(origin=(-40.8482381225, 0, 0), x_dir=(0, -1, 0), z_dir=(-1, 0, 0))):
        Polygon((94.9213875, 14.3002), (95.9754875, 20.6248), (74.3493643014, 20.6248), (73.2288921988, 20.6248), (68.8003596026, 14.3002), (94.6546875, 14.3002), align=None)
        Polygon((66.0796875, 12.7), (72.7491643014, 22.225), (66.0796875, 22.225), (66.0796875, 17.4625), align=None)
        Polygon((97.8296875, 12.7), (97.8296875, 22.225), (96.2421875, 12.7), align=None)
    extrude(amount=-F22_DEPTH, mode=Mode.SUBTRACT)

    # F23 (add): a face of the model
    f23_faces = [f16.faces().sort_by_distance(p)[0] for p in [
        (-27.5869721149, -85.2894259007, 22.225),
    ]]
    extrude(f23_faces, amount=F23_DEPTH)


with BuildPart() as f25:
    # F24 (on face) → F25 (new body)
    with BuildSketch(Plane.XZ.offset(97.8296875)):
        with BuildLine():
            Line((-20.2107381225, 64.3201985412), (-40.8482381225, 28.575))
            Line((-40.8482381225, 28.575), (-39.2480381225, 28.575))
            Line((-39.2480381225, 28.575), (-23.5188438749, 55.8187635989))
            ThreePointArc((-23.5188438749, 55.8187635989), (-22.1895462685, 60.1958508869), (-20.2107381225, 64.3201985412))
        make_face()
        with BuildLine():
            Line((-18.6105381225, 64.3201985412), (-20.2107381225, 64.3201985412))
            ThreePointArc((-20.2107381225, 64.3201985412), (-22.1895462685, 60.1958508869), (-23.5188438749, 55.8187635989))
            Line((-23.5188438749, 55.8187635989), (-18.6105381225, 64.3201985412))
        make_face()
        with BuildLine():
            ThreePointArc((-23.5188438749, 55.8187635989), (-23.131028165, 41.2468775416), (-15.9259061073, 28.575))
            Line((-15.9259061073, 28.575), (-14.3257061073, 28.575))
            ThreePointArc((-14.3257061073, 28.575), (-22.4196978205, 45.7341747223), (-18.6105381225, 64.3201985412))
            Line((-18.6105381225, 64.3201985412), (-23.5188438749, 55.8187635989))
        make_face()
    extrude(amount=-F25_DEPTH)

    # F27 (on offset) → F28 (cut)
    with BuildSketch(Plane(origin=(-43.0095165484, 0, 24.8315559569), x_dir=(0, -1, 0), z_dir=(-0.8660254038, 0, 0.5))):
        with BuildLine():
            Line((85.1297016859, 34.2753071345), (85.1297016859, 25.5440571345))
            ThreePointArc((85.1297016859, 25.5440571345), (88.2166647275, 26.8227190929), (89.4953266859, 29.9096821345))
            ThreePointArc((89.4953266859, 29.9096821345), (88.2166647275, 32.9966451762), (85.1297016859, 34.2753071345))
        make_face()
        with BuildLine():
            ThreePointArc((85.1297016859, 34.2753071345), (80.7640766859, 29.9096821345), (85.1297016859, 25.5440571345))
            Line((85.1297016859, 25.5440571345), (85.1297016859, 34.2753071345))
        make_face()
    extrude(amount=-F28_DEPTH, mode=Mode.SUBTRACT)


with BuildPart() as f29:
    # F0 (on Front) → F29 (new body)
    with BuildSketch(Plane.XZ):
        Polygon((-342.7740572504, 6.2333326149), (-341.5624201298, 0), (-17.4291241554, 63.0051302733), (-18.640761276, 69.2384628882), align=None)
    extrude(amount=F29_DEPTH)

    # F30 (cut): a face of the model
    f30_faces = [f29.faces().sort_by_distance(p)[0] for p in [
        (-180.1015907029, 0, 34.6192314441),
    ]]
    extrude(f30_faces, amount=-F30_DEPTH, mode=Mode.SUBTRACT)


with BuildPart() as f31:
    # F2 (on face) → F31 (new body)
    with BuildSketch(Plane.XY):
        with Locations((-345.678125, -69.85)):
            Rectangle(F2_W_4, F2_H_5)
    extrude(amount=F31_DEPTH)

    # F32 (on face) → F33 (join)
    with BuildSketch(Plane.YZ.offset(-342.10625)):
        with Locations((-6.35, 3.96875)):
            Rectangle(F32_W, F32_H)
        with Locations((-133.35, 3.96875)):
            Rectangle(F32_W, F32_H)
    extrude(amount=F33_DEPTH)

    # F34 (on face) → F35 (join)
    with BuildSketch(Plane.XY.offset(7.9375)):
        with Locations((-345.678125, -25.003125)):
            Rectangle(F34_W, F34_H)
        Polygon((-326.23125, -3.175), (-349.25, -3.175), (-349.25, -9.525), (-342.10625, -9.525), (-326.23125, -9.525), align=None)
        with Locations((-345.678125, -114.696875)):
            Rectangle(F34_W, F34_H)
        Polygon((-342.10625, -130.175), (-349.25, -130.175), (-349.25, -136.525), (-326.23125, -136.525), (-326.23125, -130.175), align=None)
    extrude(amount=F35_DEPTH)


solid = Compound([f1.part, f4.part, f16.part, f25.part, f29.part, f31.part])
